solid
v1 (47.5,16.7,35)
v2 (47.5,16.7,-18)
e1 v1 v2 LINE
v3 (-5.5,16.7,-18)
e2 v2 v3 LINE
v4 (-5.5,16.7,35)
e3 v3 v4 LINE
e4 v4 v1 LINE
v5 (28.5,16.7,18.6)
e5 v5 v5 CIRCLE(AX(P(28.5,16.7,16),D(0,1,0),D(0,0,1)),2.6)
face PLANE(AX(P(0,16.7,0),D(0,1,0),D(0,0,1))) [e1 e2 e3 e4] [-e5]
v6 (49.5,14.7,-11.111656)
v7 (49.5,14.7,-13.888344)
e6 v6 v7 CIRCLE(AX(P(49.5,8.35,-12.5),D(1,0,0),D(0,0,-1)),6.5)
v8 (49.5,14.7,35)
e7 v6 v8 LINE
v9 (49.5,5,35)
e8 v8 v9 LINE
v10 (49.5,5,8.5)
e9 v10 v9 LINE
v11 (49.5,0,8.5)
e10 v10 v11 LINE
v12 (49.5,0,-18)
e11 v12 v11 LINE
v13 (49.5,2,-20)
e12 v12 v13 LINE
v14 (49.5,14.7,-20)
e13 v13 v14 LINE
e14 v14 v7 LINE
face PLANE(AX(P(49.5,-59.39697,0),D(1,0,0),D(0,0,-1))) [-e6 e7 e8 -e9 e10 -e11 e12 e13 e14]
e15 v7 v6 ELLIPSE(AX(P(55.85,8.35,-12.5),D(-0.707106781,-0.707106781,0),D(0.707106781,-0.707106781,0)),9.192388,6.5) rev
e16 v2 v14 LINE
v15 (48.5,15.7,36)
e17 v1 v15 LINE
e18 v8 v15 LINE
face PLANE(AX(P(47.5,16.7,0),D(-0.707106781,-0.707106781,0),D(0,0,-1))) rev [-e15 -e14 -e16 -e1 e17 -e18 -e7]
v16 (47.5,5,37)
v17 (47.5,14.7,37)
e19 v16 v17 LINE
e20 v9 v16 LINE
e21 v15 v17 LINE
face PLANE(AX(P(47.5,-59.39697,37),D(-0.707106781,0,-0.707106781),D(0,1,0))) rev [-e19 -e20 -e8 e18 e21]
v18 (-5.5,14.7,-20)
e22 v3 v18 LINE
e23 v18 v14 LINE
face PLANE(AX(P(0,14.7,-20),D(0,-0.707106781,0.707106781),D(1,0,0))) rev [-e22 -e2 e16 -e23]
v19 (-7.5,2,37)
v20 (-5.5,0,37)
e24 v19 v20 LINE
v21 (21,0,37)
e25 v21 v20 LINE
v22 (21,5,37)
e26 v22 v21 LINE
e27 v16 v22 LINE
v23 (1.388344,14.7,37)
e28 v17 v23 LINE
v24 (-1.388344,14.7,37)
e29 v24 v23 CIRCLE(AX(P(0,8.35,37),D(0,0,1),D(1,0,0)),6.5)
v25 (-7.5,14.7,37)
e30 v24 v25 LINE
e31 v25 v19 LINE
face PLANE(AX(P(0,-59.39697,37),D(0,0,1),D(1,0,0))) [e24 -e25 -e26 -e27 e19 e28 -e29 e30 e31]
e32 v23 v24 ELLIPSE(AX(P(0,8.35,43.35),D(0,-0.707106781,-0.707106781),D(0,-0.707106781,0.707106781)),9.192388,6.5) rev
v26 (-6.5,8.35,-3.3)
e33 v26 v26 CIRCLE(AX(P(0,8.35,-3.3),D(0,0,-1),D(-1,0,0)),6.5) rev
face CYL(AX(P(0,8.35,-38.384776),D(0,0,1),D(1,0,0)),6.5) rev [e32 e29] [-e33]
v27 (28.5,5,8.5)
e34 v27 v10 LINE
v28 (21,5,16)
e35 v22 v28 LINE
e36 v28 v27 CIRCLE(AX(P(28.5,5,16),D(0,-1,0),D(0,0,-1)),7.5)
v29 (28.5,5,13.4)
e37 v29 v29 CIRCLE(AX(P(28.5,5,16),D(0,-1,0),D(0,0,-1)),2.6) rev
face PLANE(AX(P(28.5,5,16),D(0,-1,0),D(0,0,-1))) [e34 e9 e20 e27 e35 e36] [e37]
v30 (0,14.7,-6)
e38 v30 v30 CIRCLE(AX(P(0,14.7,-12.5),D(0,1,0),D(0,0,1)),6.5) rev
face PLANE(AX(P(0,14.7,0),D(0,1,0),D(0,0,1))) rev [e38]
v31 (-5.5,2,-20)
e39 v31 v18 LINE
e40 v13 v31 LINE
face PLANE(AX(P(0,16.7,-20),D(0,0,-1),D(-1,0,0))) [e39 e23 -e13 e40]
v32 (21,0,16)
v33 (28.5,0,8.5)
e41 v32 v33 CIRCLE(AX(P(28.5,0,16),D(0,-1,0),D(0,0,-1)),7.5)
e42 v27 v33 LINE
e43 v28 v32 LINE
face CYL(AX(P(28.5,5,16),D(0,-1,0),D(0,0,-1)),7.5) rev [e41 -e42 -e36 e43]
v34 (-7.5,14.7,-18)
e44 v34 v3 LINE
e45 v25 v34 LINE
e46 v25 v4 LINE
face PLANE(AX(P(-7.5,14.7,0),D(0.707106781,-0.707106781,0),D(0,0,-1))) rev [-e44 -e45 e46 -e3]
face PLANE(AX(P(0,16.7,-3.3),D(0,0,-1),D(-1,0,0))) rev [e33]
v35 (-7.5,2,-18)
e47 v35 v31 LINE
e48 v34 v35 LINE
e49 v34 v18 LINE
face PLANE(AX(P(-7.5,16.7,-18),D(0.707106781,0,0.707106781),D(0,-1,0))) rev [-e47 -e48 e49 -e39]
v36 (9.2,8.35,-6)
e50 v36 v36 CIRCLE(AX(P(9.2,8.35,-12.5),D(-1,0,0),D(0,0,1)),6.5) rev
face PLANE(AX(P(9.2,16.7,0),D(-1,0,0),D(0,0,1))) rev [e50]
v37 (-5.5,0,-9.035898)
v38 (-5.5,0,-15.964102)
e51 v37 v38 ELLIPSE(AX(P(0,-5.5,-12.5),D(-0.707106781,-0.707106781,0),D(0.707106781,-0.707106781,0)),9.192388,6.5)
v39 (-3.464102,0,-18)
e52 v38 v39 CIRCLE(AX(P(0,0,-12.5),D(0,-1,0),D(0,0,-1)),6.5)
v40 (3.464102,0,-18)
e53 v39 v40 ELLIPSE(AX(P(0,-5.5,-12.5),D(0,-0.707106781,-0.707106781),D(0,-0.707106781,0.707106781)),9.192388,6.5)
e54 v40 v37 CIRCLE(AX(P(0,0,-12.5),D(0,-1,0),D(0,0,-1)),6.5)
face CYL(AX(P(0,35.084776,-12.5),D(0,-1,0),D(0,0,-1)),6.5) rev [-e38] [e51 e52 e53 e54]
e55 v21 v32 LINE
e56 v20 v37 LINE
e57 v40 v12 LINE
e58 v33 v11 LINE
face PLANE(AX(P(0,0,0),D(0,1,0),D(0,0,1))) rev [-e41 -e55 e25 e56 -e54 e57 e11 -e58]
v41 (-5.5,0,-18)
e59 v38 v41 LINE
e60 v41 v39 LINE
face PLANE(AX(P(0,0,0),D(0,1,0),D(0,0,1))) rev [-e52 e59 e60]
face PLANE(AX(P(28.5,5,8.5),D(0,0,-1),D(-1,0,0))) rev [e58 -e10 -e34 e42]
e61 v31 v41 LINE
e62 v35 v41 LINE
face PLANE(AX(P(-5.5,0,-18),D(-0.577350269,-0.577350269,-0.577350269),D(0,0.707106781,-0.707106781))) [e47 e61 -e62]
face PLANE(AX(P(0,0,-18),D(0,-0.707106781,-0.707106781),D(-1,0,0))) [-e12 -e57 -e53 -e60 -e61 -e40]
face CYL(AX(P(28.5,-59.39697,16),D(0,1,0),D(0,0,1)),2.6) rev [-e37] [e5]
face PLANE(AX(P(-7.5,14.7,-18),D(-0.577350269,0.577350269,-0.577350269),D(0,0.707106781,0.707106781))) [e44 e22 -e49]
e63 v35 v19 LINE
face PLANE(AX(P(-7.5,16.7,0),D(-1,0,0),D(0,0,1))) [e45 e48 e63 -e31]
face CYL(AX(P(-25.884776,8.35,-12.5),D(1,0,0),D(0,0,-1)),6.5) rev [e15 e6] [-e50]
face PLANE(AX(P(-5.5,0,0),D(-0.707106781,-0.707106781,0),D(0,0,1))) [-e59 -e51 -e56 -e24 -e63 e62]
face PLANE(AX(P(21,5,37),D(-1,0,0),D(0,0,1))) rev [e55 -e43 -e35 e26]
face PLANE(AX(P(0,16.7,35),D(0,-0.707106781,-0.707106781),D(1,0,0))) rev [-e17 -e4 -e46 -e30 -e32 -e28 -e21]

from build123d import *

# Parameters (mm, degrees)
SKETCH1_W           = 15
SKETCH1_H           = 10
SKETCH1_H_2         = 15
SKETCH1_W_2         = 10
BOSS_EXTRUDE1_DEPTH = 16.7
SKETCH2_R           = 6.5
CUT_EXTRUDE1_DEPTH  = 8.3
SKETCH3_R           = 6.5
CUT_EXTRUDE2_DEPTH  = 8.3
SKETCH4_R           = 6.5
CUT_EXTRUDE3_DEPTH  = 14.7
SKETCH5_W           = 42
SKETCH5_H           = 42
SKETCH5_R           = 2.6
BOSS_EXTRUDE3_DEPTH = 16.7
FILLET9_SIZE        = 2
BOSS_EXTRUDE4_START = 32
SKETCH7_R           = 6.5
BOSS_EXTRUDE4_DEPTH = 32
BOSS_EXTRUDE5_START = 32
SKETCH8_R           = 6.5
BOSS_EXTRUDE5_DEPTH = 32
CUT_EXTRUDE4_DEPTH  = 5
CHAMFER1_SIZE       = 2


with BuildPart() as part:
    # Sketch1 → Boss-Extrude1 (new body)
    with BuildSketch(Plane(origin=(0, 0, 0), x_dir=(1, 0, 0), z_dir=(0, 1, 0))):
        Rectangle(SKETCH1_W, SKETCH1_H)
        with Locations((0, 12.5)):
            Rectangle(SKETCH1_W, SKETCH1_H_2)
        with Locations((12.5, 12.5)):
            Rectangle(SKETCH1_W_2, SKETCH1_H_2)
    extrude(amount=BOSS_EXTRUDE1_DEPTH)

    # Sketch2 → Cut-Extrude1 (cut)
    with BuildSketch(Plane.XY.offset(5)):
        with Locations((0, 8.35)):
            Circle(SKETCH2_R)
    extrude(amount=-CUT_EXTRUDE1_DEPTH, mode=Mode.SUBTRACT)

    # Sketch3 → Cut-Extrude2 (cut)
    with BuildSketch(Plane(origin=(17.5, 0, 0), x_dir=(0, 0, -1), z_dir=(1, 0, 0))):
        with Locations((12.5, 8.35)):
            Circle(SKETCH3_R)
    extrude(amount=-CUT_EXTRUDE2_DEPTH, mode=Mode.SUBTRACT)

    # Sketch4 → Cut-Extrude3 (cut)
    with BuildSketch(Plane.XZ):
        with Locations(Location((0, -12.5, 0), (0, 0, 270))):
            Circle(SKETCH4_R)
    extrude(amount=-CUT_EXTRUDE3_DEPTH, mode=Mode.SUBTRACT)

    # Fillet8
    # the kernel refuses this chamfer: 2 mm, written as the material it takes off along each edge
    with BuildSketch(Plane(origin=(-6.166666667, 1.333333333, -18.666666667), x_dir=(0.7071067811865471, 0, -0.707106781186548), z_dir=(-0.5773502691896263, -0.5773502691896255, -0.5773502691896254)), Plane(origin=(-6.166666667, 15.366666667, -18.666666667), x_dir=(0.7071067811865471, 0.7071067811865478, 0), z_dir=(-0.5773502691896261, 0.5773502691896256, -0.5773502691896256))) as fillet8_piece_1:
        Polygon((-1.414213562, -0.816496581), (1.414213562, -0.816496581), (0, 1.632993162), align=None)
    extrude(amount=2.540341184, mode=Mode.SUBTRACT)
    with BuildSketch(Plane(origin=(-7.5, 0, -25.143365976), x_dir=(-0.027495876610586494, 0.9996219169112968, 0), z_dir=(0, 0, 1)), Plane(origin=(22.643365976, 16.7, -20), x_dir=(0, 0.027495876610585647, 0.9996219169112968), z_dir=(-1, 0, 0)), Plane(origin=(-7.5, 16.7, 10.143365976), x_dir=(-0.027495876610586487, -0.9996219169112968, 0), z_dir=(0, 0, -1)), Plane(origin=(22.643365976, 0, -20), x_dir=(0, 0.9996219169112968, -0.02749587661058563), z_dir=(-1, 0, 0))) as fillet8_piece_2:
        with BuildLine():
            Line((2.05734639, 0), (-0.11309431, -2.054235587))
            Line((-0.11309431, -2.054235587), (-0.153079186, -2.053135752))
            ThreePointArc((-0.153079186, -2.053135752), (-0.068258454, -1.026795659), (-0.039984877, 0.001099835))
            Line((-0.039984877, 0.001099835), (0.001099835, 0.039984877))
            ThreePointArc((0.001099835, 0.039984877), (1.028995329, 0.011711299), (2.058446225, 0.039984877))
            Line((2.058446225, 0.039984877), (2.05734639, 0))
        make_face()
    extrude(amount=35.286731952, mode=Mode.SUBTRACT)
    with BuildSketch(Plane(origin=(-7.5, -5.143365976, -20), x_dir=(-0.02749587661058694, 0, 0.9996219169112968), z_dir=(0, 1, 0))) as fillet8_piece_3:
        with BuildLine():
            Line((2.05734639, 0), (-0.11309431, 2.054235587))
            Line((-0.11309431, 2.054235587), (-0.153079186, 2.053135752))
            ThreePointArc((-0.153079186, 2.053135752), (-0.068258454, 1.026795659), (-0.039984877, -0.001099835))
            Line((-0.039984877, -0.001099835), (0.001099835, -0.039984877))
            ThreePointArc((0.001099835, -0.039984877), (1.028995329, -0.011711299), (2.058446225, -0.039984877))
            Line((2.058446225, -0.039984877), (2.05734639, 0))
        make_face()
    extrude(amount=26.986731952, mode=Mode.SUBTRACT)

    # Sketch5 → Boss-Extrude3 (add)
    with BuildSketch(Plane(origin=(0, 16.7, 0), x_dir=(1, 0, 0), z_dir=(0, 1, 0))):
        with Locations((28.5, -16)):
            Rectangle(SKETCH5_W, SKETCH5_H)
        with Locations(Location((28.5, -16, 0), (0, 0, 270))):
            Circle(SKETCH5_R, mode=Mode.SUBTRACT)
    extrude(amount=-BOSS_EXTRUDE3_DEPTH)

    # Fillet9
    fillet9_edges = [part.edges().sort_by_distance(p)[0] for p in [
        (49.5, 8.35, 37),
    ]]
    chamfer(fillet9_edges, length=FILLET9_SIZE)

    # Sketch7 → Boss-Extrude4 (add)
    with BuildSketch(Plane.XY.offset(5).offset(BOSS_EXTRUDE4_START)):
        Polygon((-5.5, 16.7), (-7.5, 14.7), (-7.5, 2), (-5.5, 0), (7.5, 0), (7.5, 16.7), align=None)
        with Locations((0, 8.35)):
            Circle(SKETCH7_R, mode=Mode.SUBTRACT)
    extrude(amount=-BOSS_EXTRUDE4_DEPTH)

    # Sketch8 → Boss-Extrude5 (add)
    with BuildSketch(Plane(origin=(17.5, 0, 0), x_dir=(0, 0, -1), z_dir=(1, 0, 0)).offset(BOSS_EXTRUDE5_START)):
        Polygon((5, 16.7), (5, 0), (18, 0), (20, 2), (20, 14.7), (18, 16.7), align=None)
        with Locations((12.5, 8.35)):
            Circle(SKETCH8_R, mode=Mode.SUBTRACT)
    extrude(amount=-BOSS_EXTRUDE5_DEPTH)

    # Sketch9 → Cut-Extrude4 (cut)
    with BuildSketch(Plane.XZ):
        with BuildLine():
            Line((28.5, 8.5), (49.5, 8.5))
            Line((49.5, 8.5), (49.5, 35))
            Line((49.5, 35), (47.5, 37))
            Line((47.5, 37), (28.5, 37))
            Line((28.5, 37), (21, 37))
            Line((21, 37), (21, 16))
            ThreePointArc((21, 16), (23.196699141, 10.696699141), (28.5, 8.5))
        make_face()
    extrude(amount=-CUT_EXTRUDE4_DEPTH, mode=Mode.SUBTRACT)

    # Chamfer1
    # the kernel refuses this chamfer: 2 mm, written as the material it takes off along each edge
    with BuildSketch(Plane(origin=(49.5, 16.7, 40.143365976), x_dir=(-0.9996219169112968, 0.027495876610585647, 0), z_dir=(0, 0, -1)), Plane(origin=(-10.643365976, 16.7, 37), x_dir=(0, 0.027495876610585647, -0.9996219169112968), z_dir=(1, 0, 0))) as chamfer1_piece_1:
        Polygon((CHAMFER1_SIZE * 0.999621916911, -CHAMFER1_SIZE * 0.0274958766106), (-CHAMFER1_SIZE * 0.0274958766106, -CHAMFER1_SIZE * 0.999621916911), (0, 0), align=None)
    extrude(amount=63.286731952, mode=Mode.SUBTRACT)


solid = part.part
